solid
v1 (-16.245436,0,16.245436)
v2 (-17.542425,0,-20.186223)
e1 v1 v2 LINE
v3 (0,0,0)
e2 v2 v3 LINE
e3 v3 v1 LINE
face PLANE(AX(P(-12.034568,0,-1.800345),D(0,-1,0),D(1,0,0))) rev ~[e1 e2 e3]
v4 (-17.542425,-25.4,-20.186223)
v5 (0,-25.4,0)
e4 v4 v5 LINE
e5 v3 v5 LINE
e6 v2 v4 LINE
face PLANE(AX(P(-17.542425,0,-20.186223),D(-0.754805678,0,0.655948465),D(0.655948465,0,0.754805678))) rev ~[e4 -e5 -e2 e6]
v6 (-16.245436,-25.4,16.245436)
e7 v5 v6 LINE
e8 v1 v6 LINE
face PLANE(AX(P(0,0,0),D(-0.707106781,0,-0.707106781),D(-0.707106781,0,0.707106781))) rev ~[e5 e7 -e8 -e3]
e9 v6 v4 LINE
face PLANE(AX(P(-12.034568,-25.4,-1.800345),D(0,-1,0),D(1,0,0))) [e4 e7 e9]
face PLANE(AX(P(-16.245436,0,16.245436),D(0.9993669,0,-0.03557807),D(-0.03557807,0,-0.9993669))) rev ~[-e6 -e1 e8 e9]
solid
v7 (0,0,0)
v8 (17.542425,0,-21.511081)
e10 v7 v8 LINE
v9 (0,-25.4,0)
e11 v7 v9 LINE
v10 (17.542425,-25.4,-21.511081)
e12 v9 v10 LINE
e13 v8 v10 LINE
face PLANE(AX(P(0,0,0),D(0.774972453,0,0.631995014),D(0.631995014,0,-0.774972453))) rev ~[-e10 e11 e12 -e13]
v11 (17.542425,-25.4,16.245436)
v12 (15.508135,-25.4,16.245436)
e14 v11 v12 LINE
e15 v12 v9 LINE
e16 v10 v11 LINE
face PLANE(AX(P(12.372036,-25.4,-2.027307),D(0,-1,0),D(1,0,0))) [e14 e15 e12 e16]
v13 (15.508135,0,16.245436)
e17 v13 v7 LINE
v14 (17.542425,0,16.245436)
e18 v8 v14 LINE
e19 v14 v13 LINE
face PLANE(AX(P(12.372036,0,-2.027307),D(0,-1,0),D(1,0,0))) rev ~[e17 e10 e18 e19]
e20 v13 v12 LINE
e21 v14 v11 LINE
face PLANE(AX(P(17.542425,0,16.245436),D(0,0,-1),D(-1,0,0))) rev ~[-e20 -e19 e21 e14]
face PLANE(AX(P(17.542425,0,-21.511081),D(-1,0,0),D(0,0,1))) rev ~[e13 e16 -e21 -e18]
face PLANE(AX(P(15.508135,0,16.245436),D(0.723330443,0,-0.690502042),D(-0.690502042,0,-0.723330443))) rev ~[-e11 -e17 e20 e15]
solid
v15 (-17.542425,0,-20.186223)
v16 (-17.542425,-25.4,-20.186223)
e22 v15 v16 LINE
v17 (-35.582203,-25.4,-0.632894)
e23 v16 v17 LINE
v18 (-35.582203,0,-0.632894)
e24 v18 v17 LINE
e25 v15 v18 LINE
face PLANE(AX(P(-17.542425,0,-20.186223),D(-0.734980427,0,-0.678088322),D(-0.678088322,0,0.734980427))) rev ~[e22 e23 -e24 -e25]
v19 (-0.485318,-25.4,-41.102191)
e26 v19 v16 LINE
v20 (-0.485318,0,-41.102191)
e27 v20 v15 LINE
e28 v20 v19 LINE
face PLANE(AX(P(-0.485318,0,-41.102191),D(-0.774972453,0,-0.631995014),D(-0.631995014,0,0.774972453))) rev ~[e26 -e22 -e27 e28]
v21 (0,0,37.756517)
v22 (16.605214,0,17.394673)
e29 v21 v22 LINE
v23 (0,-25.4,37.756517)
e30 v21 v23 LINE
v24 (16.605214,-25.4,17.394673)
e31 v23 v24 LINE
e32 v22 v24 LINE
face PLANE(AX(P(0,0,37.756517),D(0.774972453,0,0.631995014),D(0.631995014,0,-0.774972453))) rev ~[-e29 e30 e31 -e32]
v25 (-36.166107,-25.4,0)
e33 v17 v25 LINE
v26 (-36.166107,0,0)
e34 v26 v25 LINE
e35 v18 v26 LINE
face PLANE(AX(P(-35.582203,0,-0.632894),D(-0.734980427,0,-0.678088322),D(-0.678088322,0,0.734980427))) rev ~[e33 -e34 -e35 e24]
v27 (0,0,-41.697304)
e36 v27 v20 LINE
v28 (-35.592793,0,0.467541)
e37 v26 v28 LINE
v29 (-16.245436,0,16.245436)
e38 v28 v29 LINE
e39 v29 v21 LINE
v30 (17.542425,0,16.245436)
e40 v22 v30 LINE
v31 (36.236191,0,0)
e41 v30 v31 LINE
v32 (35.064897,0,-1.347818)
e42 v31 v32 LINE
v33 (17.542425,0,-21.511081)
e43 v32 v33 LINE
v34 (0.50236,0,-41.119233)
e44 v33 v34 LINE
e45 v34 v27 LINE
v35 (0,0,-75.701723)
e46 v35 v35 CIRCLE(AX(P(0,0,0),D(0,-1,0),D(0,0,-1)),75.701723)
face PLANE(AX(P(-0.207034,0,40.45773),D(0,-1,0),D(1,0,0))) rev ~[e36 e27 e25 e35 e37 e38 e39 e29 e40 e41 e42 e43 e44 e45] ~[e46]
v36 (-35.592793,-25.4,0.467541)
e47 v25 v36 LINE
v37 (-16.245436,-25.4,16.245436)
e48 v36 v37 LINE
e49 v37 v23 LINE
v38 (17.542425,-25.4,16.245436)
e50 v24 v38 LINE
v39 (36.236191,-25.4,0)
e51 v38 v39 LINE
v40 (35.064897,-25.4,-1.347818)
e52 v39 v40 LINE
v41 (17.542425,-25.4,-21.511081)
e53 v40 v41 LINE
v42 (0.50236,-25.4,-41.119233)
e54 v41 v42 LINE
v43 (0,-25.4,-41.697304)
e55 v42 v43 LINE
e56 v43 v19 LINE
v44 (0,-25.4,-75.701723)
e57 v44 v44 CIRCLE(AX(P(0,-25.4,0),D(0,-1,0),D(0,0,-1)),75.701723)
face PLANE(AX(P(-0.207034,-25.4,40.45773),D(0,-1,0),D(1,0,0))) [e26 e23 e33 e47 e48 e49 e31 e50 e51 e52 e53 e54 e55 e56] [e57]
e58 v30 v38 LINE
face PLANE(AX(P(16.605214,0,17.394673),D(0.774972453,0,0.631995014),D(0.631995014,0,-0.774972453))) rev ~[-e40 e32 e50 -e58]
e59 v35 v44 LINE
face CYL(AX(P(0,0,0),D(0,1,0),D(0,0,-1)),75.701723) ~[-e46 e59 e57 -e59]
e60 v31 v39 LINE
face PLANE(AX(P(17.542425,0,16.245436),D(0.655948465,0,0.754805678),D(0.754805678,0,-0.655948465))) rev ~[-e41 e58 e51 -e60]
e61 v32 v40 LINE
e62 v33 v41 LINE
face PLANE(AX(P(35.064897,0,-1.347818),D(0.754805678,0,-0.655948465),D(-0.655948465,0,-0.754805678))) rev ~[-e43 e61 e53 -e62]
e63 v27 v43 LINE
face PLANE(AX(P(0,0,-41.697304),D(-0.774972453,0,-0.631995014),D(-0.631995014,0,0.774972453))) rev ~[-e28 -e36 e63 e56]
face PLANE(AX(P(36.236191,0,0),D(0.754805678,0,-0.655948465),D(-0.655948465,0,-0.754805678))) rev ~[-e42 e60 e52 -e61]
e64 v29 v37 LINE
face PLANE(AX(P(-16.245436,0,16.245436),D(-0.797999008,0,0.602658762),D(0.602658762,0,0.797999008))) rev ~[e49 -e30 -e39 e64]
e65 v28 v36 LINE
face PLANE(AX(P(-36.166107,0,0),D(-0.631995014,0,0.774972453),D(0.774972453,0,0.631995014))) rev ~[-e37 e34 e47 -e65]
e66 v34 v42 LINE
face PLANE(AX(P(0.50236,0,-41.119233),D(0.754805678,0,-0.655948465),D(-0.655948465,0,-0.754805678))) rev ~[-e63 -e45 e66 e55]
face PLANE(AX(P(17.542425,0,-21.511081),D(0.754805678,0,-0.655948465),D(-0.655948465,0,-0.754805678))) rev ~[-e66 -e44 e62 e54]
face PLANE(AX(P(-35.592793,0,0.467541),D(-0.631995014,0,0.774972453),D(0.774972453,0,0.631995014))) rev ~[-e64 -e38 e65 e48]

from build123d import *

# Parameters (mm, degrees)
F1_DEPTH = 25.4


with BuildPart() as f1:
    # F0 (on Front) → F1 (new body)
    with BuildSketch(Plane.XZ):
        with BuildLine():
            Line((36.0940568046, 37.8100693834), (75.7017228123, 0))
            ThreePointArc((75.7017228123, 0), (0, 75.7017228123), (-75.7017228123, 0))
            Line((-75.7017228123, 0), (-1.7577517696, 73.9439710427))
            Line((-1.7577517696, 73.9439710427), (36.0940568046, 37.8100693834))
        make_face()
        Polygon((34.0044190793, -41.6973037331), (75.7017228123, 0), (36.0940568046, 37.8100693834), (35.1256847707, 0.9650623831), (36.2361905576, 0), (35.0648969253, -1.3478179023), align=None)
        with BuildLine():
            ThreePointArc((0, -75.7017228123), (53.5292015481, -53.5292015481), (75.7017228123, 0))
            Line((75.7017228123, 0), (34.0044190793, -41.6973037331))
            Line((34.0044190793, -41.6973037331), (0, -75.7017228123))
        make_face()
        with BuildLine():
            Line((-35.1984994172, -40.5032233952), (-75.7017228123, 0))
            ThreePointArc((-75.7017228123, 0), (-53.5292015481, -53.5292015481), (0, -75.7017228123))
            Line((0, -75.7017228123), (-35.1984994172, -40.5032233952))
        make_face()
        Polygon((-1.7577517696, 73.9439710427), (-75.7017228123, 0), (-35.1984994172, -40.5032233952), (-35.5822025801, -0.6328943901), (-36.1661069663, 0), (-35.5927929278, 0.4675412817), (-35.9341153342, 35.9341153342), (-37.8100693834, 37.8100693834), (36.0940568046, 37.8100693834), align=None)
        Polygon((-35.1984994172, -40.5032233952), (0, -75.7017228123), (34.0044190793, -41.6973037331), (0.5023601674, -41.1192334624), (0, -41.6973037331), (-0.4853180091, -41.1021913041), align=None)
        Polygon((35.1256847707, 0.9650623831), (36.0940568046, 37.8100693834), (16.6052143863, 17.3946727981), (17.5424247587, 16.2454355338), align=None)
        Polygon((16.6052143863, 17.3946727981), (36.0940568046, 37.8100693834), (-37.8100693834, 37.8100693834), (-35.9341153342, 35.9341153342), (-16.2454355338, 16.2454355338), (0, 37.7565165398), align=None)
        Polygon((0.5023601674, -41.1192334624), (34.0044190793, -41.6973037331), (17.5424247587, -21.511081006), align=None)
        Polygon((17.5424247587, -21.511081006), (34.0044190793, -41.6973037331), (35.0648969253, -1.3478179023), align=None)
        Polygon((-35.5822025801, -0.6328943901), (-35.1984994172, -40.5032233952), (-17.5424247587, -20.1862227271), align=None)
        Polygon((-17.5424247587, -20.1862227271), (-35.1984994172, -40.5032233952), (-0.4853180091, -41.1021913041), align=None)
        Polygon((-16.2454355338, 16.2454355338), (-35.9341153342, 35.9341153342), (-35.5927929278, 0.4675412817), align=None)
    extrude(amount=F1_DEPTH)


with BuildPart() as f1b:
    # F0 (on Front) → F1, piece 2 (new body)
    with BuildSketch(Plane.XZ):
        Polygon((0, 0), (17.5424247587, -21.511081006), (17.5424247587, 16.2454355338), (15.5081353336, 16.2454355338), align=None)
    extrude(amount=F1_DEPTH)


with BuildPart() as f1c:
    # F0 (on Front) → F1, piece 3 (new body)
    with BuildSketch(Plane.XZ):
        Polygon((-16.2454355338, 16.2454355338), (-17.5424247587, -20.1862227271), (0, 0), align=None)
    extrude(amount=F1_DEPTH)


solid = Compound([f1.part, f1b.part, f1c.part])
